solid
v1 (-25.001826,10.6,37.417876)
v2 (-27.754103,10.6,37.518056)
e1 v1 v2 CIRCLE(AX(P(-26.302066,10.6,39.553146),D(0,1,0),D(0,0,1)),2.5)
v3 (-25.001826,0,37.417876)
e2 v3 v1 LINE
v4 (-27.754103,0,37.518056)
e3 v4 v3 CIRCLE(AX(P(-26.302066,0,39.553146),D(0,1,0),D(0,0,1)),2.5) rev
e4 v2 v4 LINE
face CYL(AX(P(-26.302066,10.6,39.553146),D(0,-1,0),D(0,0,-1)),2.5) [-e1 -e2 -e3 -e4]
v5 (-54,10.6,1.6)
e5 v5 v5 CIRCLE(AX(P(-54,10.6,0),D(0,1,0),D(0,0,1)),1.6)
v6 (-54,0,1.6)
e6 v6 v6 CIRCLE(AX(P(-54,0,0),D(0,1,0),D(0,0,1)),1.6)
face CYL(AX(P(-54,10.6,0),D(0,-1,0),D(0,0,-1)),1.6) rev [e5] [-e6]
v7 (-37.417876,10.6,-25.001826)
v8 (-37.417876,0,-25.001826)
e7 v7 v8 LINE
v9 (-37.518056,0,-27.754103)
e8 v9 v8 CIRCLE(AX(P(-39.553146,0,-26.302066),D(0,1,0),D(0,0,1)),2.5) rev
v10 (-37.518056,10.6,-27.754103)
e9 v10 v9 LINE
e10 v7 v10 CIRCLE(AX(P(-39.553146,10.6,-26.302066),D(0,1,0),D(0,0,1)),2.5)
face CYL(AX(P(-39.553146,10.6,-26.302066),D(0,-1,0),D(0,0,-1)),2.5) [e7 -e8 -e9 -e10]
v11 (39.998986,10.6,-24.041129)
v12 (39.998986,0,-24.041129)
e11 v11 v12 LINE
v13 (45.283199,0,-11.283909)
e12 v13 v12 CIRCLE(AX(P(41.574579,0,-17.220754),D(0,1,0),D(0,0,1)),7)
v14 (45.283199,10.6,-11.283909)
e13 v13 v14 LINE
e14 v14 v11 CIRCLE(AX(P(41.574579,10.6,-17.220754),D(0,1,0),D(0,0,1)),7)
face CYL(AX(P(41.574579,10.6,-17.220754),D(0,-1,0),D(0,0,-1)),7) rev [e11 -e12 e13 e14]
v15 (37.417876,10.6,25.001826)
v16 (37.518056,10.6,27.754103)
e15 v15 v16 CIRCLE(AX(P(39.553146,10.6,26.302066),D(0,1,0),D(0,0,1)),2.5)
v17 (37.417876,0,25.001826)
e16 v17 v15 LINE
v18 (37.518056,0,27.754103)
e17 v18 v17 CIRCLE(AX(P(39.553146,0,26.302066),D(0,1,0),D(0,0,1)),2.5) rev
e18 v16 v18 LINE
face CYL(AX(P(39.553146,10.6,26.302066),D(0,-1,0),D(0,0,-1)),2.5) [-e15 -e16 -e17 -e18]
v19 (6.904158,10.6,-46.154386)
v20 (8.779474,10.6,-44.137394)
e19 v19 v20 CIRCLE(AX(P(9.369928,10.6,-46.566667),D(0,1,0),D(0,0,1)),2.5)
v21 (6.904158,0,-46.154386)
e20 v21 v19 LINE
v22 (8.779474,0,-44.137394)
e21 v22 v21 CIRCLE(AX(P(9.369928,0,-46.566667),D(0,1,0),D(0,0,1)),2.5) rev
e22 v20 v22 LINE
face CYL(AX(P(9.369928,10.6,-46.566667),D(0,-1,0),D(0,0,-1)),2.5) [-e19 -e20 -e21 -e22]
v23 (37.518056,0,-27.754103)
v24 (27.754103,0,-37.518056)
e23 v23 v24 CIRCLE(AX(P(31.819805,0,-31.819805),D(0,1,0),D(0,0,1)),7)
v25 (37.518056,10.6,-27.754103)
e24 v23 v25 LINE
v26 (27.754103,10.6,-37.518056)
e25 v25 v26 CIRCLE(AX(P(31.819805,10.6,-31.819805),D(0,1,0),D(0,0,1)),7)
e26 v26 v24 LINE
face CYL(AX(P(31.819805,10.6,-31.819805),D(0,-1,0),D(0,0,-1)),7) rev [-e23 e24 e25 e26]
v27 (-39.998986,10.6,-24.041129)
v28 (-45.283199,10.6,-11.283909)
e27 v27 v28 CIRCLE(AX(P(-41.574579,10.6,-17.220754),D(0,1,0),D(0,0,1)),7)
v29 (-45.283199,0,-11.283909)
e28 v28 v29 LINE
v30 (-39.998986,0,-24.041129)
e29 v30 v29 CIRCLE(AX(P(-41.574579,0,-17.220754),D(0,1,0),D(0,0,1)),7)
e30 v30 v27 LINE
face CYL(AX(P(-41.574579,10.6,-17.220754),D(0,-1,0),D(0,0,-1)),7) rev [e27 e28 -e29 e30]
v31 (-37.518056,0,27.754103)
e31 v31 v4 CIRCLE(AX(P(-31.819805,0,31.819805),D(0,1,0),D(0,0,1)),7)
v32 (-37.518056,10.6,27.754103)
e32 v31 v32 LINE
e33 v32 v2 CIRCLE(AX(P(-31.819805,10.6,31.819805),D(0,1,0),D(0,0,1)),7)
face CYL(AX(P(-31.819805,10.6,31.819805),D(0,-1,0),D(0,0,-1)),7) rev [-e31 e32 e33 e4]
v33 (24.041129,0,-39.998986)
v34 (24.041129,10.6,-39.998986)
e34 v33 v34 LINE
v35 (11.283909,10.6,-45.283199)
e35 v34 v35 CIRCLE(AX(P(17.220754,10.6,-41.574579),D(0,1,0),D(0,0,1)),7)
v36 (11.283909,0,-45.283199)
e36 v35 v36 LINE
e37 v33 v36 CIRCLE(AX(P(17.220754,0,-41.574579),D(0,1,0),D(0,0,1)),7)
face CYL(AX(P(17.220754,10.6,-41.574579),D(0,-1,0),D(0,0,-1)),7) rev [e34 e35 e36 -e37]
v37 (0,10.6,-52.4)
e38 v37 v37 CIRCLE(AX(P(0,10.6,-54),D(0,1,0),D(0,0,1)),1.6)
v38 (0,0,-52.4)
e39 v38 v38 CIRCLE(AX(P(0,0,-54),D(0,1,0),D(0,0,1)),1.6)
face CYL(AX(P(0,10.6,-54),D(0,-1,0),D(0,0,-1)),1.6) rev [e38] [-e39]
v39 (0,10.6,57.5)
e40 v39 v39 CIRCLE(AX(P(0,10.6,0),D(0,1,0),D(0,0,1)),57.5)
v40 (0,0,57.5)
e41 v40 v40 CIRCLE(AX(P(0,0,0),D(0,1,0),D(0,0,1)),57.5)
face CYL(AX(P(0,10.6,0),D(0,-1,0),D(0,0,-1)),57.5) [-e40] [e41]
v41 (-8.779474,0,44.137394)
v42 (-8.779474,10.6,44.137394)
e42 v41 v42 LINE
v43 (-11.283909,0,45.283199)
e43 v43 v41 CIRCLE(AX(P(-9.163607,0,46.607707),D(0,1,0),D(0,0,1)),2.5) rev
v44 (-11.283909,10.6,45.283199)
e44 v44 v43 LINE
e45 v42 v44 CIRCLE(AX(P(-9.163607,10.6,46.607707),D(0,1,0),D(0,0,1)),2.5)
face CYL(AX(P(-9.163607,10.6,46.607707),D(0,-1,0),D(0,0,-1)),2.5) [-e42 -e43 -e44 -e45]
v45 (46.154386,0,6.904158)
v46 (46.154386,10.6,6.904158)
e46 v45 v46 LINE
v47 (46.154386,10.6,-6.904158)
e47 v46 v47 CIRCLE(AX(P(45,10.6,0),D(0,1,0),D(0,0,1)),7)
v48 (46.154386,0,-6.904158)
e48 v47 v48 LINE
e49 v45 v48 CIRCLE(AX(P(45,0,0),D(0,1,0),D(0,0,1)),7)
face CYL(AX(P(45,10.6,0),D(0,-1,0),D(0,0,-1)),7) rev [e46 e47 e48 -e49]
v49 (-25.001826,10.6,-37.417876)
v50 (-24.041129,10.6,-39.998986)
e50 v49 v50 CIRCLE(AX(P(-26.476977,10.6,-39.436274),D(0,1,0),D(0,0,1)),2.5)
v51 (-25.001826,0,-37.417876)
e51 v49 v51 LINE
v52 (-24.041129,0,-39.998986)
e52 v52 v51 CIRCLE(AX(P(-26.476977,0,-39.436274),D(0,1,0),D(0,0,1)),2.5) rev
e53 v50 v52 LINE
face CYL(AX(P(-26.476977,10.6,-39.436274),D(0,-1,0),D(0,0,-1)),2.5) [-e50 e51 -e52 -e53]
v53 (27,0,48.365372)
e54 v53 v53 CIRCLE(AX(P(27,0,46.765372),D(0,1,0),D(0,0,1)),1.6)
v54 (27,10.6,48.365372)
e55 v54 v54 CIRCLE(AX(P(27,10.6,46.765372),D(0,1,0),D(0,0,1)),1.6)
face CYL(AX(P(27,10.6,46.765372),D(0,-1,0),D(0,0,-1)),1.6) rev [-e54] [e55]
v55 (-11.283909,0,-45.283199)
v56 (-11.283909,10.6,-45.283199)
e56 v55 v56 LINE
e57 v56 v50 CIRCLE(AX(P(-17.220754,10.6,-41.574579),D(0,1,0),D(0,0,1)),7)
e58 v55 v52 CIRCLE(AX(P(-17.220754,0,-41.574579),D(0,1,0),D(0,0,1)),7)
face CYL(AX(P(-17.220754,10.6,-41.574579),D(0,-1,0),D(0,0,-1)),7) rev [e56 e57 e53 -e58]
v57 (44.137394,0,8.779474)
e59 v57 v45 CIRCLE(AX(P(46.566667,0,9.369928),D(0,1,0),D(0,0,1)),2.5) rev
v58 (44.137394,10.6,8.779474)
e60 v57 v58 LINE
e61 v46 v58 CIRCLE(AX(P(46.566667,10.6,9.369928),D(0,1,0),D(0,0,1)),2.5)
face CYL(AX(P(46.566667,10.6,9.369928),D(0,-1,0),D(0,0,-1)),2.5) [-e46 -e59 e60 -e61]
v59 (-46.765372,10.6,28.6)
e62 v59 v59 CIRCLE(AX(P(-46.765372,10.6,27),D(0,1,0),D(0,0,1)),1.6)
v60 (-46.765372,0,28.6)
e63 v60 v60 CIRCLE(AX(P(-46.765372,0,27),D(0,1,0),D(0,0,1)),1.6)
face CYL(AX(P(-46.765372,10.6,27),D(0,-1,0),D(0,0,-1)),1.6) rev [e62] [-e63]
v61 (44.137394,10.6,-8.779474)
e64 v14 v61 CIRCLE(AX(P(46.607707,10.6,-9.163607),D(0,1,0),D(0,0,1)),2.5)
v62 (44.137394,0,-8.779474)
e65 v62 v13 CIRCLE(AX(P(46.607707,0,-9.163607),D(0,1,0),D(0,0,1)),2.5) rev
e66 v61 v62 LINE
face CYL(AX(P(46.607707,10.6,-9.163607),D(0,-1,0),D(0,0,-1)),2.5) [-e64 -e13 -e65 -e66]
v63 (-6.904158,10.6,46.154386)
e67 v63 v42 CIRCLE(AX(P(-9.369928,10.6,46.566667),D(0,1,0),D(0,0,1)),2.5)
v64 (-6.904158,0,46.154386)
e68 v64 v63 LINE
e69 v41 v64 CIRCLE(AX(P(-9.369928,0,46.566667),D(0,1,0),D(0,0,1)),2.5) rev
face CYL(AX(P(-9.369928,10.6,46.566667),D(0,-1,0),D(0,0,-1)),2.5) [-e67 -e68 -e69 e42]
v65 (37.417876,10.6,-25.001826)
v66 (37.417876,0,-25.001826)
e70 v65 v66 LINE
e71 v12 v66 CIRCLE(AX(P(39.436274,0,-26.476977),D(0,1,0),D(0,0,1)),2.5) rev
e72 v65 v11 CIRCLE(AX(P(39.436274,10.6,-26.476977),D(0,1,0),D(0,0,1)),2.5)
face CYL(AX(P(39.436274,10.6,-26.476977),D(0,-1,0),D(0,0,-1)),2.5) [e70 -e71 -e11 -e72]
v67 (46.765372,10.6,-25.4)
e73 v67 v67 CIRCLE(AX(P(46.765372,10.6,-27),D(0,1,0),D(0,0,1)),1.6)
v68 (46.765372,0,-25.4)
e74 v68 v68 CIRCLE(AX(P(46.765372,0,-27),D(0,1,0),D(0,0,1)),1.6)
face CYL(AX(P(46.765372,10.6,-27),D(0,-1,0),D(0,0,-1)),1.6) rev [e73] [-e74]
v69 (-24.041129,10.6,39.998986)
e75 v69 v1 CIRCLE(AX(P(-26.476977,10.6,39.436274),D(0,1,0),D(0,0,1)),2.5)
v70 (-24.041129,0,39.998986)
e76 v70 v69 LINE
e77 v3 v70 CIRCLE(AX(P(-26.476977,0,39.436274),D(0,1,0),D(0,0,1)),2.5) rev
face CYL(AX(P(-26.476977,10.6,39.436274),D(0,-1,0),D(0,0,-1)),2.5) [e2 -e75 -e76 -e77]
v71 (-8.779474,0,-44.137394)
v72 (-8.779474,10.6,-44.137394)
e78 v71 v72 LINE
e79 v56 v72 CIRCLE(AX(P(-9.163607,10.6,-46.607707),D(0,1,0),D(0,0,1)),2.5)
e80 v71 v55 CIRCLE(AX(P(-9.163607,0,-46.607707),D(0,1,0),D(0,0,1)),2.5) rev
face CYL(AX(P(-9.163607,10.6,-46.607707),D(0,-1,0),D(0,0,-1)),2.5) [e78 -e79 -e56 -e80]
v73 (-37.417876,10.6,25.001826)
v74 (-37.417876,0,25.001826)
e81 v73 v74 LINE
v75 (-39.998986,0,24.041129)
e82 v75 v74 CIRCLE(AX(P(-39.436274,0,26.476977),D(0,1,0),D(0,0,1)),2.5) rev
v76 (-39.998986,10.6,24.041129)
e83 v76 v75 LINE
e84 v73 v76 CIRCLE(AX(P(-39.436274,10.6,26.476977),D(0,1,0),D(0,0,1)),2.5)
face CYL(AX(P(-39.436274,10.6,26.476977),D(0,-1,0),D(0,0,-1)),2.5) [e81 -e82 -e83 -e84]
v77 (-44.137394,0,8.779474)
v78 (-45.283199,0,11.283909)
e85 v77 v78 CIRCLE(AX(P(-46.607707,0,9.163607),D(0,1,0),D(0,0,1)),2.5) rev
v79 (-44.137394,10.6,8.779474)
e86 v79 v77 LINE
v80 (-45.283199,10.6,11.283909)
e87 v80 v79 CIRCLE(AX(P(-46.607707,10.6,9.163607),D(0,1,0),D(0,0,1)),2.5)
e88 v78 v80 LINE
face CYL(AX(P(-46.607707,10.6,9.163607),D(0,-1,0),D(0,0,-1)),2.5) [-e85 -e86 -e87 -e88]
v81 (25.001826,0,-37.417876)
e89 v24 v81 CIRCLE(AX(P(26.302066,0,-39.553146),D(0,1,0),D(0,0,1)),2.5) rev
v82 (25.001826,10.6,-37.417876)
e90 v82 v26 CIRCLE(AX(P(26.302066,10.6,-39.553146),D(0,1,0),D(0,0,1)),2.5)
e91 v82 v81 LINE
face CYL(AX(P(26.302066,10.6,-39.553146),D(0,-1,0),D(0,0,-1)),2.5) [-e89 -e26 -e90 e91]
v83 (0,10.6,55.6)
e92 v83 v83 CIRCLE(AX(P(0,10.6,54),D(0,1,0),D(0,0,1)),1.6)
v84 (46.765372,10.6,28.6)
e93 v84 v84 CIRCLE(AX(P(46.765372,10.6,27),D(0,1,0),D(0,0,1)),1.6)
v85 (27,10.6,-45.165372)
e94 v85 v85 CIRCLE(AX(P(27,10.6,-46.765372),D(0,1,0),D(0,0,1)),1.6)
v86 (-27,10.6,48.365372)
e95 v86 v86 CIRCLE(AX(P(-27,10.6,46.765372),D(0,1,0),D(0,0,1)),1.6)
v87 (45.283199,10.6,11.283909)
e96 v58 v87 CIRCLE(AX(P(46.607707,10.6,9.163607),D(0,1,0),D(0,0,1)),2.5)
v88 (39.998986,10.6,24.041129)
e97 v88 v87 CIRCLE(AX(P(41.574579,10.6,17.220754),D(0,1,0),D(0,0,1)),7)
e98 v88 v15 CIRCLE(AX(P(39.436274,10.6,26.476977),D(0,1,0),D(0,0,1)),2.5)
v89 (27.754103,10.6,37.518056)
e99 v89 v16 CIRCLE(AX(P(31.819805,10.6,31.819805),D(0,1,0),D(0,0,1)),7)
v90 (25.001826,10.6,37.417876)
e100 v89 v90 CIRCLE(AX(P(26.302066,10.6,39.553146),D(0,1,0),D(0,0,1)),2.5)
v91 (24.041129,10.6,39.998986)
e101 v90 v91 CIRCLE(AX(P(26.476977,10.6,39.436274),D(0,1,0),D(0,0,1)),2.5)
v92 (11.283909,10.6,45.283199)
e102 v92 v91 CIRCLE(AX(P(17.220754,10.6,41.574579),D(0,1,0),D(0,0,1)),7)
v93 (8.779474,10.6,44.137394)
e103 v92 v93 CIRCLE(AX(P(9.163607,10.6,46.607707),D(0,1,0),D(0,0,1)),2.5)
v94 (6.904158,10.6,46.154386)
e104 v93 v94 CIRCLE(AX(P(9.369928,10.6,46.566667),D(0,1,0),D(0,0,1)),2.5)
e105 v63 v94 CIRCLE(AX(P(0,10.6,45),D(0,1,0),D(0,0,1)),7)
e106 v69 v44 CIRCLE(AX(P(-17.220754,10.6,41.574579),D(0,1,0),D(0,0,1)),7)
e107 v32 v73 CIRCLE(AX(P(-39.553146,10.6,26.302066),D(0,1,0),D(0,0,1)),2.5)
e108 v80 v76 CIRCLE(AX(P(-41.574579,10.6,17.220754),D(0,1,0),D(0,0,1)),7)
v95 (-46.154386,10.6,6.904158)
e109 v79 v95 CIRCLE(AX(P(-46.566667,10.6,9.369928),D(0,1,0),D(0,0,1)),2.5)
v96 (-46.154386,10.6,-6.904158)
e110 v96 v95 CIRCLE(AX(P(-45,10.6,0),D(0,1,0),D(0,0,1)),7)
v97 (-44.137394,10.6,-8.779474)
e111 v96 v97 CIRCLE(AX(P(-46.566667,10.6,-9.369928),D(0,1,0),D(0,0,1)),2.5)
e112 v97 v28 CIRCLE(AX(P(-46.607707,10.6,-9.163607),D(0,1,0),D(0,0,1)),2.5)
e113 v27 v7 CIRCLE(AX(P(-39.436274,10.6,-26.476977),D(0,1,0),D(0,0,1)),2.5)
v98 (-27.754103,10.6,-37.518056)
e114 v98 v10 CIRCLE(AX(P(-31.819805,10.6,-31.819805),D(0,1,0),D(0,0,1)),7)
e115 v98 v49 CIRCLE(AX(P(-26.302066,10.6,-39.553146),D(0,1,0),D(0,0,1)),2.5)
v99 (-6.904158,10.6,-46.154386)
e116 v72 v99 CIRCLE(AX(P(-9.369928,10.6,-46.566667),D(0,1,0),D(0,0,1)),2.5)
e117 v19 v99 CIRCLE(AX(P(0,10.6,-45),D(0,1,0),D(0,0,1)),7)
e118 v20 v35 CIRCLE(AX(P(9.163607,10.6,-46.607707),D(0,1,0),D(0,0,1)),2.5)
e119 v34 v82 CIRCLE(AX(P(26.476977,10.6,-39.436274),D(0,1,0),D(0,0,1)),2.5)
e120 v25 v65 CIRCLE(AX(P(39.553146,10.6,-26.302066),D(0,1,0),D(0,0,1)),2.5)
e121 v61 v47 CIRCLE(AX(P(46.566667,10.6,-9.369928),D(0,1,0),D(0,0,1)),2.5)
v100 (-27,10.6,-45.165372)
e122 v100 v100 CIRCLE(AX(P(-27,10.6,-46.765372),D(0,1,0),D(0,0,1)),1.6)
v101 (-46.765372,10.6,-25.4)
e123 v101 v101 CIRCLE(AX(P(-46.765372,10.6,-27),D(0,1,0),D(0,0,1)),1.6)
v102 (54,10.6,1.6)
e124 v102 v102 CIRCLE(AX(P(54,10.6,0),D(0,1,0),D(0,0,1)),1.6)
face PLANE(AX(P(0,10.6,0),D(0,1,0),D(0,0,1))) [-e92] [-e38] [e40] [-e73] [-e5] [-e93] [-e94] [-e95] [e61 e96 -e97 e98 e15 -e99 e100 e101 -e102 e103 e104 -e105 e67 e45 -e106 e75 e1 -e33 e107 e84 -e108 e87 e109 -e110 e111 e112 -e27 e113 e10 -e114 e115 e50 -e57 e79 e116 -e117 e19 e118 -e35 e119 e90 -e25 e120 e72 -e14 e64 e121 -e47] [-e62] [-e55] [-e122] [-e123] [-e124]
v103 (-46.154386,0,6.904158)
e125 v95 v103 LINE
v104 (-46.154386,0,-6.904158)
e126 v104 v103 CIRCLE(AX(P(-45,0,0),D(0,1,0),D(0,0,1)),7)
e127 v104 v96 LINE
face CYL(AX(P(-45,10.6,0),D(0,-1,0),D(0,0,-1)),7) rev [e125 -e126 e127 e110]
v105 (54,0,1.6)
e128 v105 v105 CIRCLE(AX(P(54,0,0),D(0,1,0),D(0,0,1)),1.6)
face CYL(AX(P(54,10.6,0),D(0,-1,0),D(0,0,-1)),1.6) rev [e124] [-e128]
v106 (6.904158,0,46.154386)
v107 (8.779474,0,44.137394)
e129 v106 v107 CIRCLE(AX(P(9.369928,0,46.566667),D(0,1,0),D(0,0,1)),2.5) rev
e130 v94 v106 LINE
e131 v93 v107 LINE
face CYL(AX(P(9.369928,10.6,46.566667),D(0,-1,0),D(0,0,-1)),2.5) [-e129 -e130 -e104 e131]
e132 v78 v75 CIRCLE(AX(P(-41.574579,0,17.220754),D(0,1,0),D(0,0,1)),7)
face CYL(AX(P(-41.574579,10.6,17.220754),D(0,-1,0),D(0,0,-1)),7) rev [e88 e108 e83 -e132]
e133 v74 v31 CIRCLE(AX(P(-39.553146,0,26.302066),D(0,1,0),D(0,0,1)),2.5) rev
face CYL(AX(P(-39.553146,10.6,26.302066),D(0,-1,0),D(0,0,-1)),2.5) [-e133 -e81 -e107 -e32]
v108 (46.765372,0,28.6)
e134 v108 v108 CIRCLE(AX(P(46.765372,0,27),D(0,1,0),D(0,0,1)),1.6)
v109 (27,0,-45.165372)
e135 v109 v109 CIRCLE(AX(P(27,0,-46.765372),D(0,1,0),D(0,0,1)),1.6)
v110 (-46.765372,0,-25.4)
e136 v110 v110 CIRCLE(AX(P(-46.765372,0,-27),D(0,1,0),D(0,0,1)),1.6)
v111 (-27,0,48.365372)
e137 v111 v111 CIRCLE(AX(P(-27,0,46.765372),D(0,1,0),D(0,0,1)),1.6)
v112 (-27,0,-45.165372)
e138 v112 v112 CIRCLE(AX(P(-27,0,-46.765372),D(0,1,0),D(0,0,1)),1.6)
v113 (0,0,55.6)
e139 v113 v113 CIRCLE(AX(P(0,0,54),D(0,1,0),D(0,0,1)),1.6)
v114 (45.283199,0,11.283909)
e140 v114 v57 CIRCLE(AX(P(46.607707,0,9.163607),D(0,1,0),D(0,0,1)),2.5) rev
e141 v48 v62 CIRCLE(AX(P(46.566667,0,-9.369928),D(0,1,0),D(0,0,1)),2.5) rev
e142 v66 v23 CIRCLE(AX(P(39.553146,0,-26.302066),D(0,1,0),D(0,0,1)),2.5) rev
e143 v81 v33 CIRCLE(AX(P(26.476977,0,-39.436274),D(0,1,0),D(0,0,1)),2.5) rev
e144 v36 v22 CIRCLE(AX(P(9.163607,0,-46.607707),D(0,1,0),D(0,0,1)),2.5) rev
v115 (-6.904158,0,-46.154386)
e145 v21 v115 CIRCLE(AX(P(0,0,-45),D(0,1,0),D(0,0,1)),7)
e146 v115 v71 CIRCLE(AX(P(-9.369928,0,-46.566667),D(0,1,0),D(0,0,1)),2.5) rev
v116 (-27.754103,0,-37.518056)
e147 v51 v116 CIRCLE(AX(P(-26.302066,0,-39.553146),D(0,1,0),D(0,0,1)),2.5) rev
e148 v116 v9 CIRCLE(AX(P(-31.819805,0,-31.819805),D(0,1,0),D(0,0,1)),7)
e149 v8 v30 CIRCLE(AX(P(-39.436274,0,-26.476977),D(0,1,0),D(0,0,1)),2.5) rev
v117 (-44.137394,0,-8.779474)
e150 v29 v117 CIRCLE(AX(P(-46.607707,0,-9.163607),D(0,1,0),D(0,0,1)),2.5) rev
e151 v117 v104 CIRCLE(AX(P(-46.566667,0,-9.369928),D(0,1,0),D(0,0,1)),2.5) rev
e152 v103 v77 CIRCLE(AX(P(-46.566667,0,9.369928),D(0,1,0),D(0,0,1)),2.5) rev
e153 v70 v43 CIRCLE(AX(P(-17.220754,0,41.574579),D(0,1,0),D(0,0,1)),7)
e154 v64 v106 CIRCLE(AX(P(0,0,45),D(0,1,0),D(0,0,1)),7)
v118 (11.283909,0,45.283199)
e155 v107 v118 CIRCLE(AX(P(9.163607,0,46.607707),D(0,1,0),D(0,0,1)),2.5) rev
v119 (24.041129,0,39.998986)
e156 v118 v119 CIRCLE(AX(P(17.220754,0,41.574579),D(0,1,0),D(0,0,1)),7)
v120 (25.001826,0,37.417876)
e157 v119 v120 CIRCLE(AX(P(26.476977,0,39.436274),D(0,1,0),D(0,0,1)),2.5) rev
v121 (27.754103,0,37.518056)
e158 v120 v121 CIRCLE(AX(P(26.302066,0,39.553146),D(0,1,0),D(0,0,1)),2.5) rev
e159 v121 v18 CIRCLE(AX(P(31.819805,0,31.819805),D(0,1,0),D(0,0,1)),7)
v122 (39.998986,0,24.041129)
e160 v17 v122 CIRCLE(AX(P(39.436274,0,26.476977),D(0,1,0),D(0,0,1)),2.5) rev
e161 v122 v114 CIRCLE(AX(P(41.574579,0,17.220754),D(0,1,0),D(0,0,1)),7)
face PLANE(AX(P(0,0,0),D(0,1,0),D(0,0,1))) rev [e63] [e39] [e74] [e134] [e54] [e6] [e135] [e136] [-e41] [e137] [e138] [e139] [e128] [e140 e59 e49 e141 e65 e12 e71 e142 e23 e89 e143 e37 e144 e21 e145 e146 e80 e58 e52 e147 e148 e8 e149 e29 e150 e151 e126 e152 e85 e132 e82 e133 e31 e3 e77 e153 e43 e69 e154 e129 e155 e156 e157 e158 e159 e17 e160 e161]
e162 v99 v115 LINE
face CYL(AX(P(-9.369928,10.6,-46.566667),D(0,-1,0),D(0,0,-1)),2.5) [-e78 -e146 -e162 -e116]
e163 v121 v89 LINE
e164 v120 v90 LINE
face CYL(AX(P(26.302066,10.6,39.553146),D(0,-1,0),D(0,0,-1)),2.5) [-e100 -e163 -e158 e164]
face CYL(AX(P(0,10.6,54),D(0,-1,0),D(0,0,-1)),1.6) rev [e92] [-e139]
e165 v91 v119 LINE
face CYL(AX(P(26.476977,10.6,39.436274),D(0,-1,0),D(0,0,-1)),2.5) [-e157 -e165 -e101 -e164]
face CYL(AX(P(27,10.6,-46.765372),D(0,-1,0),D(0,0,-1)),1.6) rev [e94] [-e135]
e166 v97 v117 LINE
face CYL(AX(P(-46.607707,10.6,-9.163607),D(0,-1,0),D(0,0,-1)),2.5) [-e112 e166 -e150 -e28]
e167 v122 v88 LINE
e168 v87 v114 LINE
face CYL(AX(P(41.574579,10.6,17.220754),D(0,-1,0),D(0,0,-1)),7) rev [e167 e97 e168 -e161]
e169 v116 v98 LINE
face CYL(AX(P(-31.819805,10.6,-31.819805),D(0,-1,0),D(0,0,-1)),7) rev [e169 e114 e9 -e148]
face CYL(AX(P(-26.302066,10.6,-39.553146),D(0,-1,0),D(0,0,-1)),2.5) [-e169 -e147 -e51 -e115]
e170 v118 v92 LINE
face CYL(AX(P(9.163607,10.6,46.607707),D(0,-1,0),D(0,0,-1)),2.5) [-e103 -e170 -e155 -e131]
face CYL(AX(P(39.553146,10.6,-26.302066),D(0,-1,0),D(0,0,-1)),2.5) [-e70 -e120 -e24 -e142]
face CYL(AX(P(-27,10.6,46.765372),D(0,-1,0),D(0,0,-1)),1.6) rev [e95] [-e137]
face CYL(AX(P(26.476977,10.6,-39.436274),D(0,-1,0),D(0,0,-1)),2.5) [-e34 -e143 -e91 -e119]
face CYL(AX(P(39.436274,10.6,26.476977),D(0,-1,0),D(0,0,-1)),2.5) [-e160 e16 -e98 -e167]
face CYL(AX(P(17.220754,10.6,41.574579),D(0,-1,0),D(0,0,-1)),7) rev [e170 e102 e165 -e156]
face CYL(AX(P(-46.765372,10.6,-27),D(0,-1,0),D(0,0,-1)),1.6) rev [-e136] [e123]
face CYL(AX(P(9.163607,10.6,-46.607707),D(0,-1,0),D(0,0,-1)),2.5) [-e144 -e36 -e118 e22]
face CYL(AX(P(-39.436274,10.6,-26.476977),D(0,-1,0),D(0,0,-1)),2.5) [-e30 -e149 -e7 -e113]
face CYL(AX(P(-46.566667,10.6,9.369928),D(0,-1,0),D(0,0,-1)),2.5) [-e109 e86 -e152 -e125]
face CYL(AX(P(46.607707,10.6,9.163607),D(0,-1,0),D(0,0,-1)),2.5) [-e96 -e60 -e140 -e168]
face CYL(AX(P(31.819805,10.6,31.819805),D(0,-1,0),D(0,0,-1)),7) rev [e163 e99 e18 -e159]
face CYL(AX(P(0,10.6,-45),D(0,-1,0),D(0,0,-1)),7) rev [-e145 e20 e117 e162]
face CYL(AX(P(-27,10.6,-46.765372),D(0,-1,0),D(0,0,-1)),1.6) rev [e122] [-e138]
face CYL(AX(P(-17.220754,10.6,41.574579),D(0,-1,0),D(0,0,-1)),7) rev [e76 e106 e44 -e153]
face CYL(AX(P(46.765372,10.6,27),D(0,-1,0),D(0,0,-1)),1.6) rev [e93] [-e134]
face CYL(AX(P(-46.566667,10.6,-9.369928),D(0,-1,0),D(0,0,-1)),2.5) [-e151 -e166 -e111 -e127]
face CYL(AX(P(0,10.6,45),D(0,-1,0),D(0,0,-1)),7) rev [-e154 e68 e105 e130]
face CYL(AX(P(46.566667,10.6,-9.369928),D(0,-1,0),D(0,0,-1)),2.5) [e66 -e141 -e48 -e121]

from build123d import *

# Parameters (mm, degrees)
SKETCH1_R           = 57.5
SKETCH1_R_2         = 1.6
BOSS_EXTRUDE1_DEPTH = 10.6
FILLET1_R           = 2.5


with BuildPart() as part:
    # Sketch1 → Boss-Extrude1 (new body)
    with BuildSketch(Plane(origin=(0, 0, 0), x_dir=(1, 0, 0), z_dir=(0, 1, 0))):
        with Locations(Location((0, 0, 0), (0, 0, 270))):
            Circle(SKETCH1_R)
        with Locations(Location((-27, -46.765371804, 0), (0, 0, 270))):
            Circle(SKETCH1_R_2, mode=Mode.SUBTRACT)
        with Locations(Location((-46.765371804, -27, 0), (0, 0, 270))):
            Circle(SKETCH1_R_2, mode=Mode.SUBTRACT)
        with Locations(Location((-54, 0, 0), (0, 0, 270))):
            Circle(SKETCH1_R_2, mode=Mode.SUBTRACT)
        with Locations(Location((0, -54, 0), (0, 0, 270))):
            Circle(SKETCH1_R_2, mode=Mode.SUBTRACT)
        with Locations(Location((27, -46.765371804, 0), (0, 0, 270))):
            Circle(SKETCH1_R_2, mode=Mode.SUBTRACT)
        with BuildLine():
            ThreePointArc((43.742247125, 10.564838686), (44.135337618, 8.779064491), (44.455555556, 6.978795043))
            ThreePointArc((44.455555556, 6.978795043), (49.753361384, 5.138633627), (52, 0))
            ThreePointArc((52, 0), (49.753361384, -5.138633627), (44.455555556, -6.978795043))
            ThreePointArc((44.455555556, -6.978795043), (44.135337618, -8.779064491), (43.742247125, -10.564838686))
            ThreePointArc((43.742247125, -10.564838686), (47.23910353, -13.108193036), (48.574578963, -17.220754456))
            ThreePointArc((48.574578963, -17.220754456), (45.234108152, -23.187985482), (38.400908644, -23.459970489))
            ThreePointArc((38.400908644, -23.459970489), (37.416132554, -25.000660486), (36.369578094, -26.500071496))
            ThreePointArc((36.369578094, -26.500071496), (38.177808401, -28.89135937), (38.819805153, -31.819805153))
            ThreePointArc((38.819805153, -31.819805153), (34.244868492, -38.386316236), (26.500071496, -36.369578094))
            ThreePointArc((26.500071496, -36.369578094), (25.000660486, -37.416132554), (23.459970489, -38.400908644))
            ThreePointArc((23.459970489, -38.400908644), (24.027901885, -39.942787345), (24.220754456, -41.574578963))
            ThreePointArc((24.220754456, -41.574578963), (18.318158122, -48.488022764), (10.564838686, -43.742247125))
            ThreePointArc((10.564838686, -43.742247125), (8.779064491, -44.135337618), (6.978795043, -44.455555556))
            ThreePointArc((6.978795043, -44.455555556), (6.994696752, -44.727571384), (7, -45))
            ThreePointArc((7, -45), (-0.272428616, -51.994696752), (-6.978795043, -44.455555556))
            ThreePointArc((-6.978795043, -44.455555556), (-8.779064491, -44.135337618), (-10.564838686, -43.742247125))
            ThreePointArc((-10.564838686, -43.742247125), (-19.899538483, -48.041735691), (-23.459970489, -38.400908644))
            ThreePointArc((-23.459970489, -38.400908644), (-25.000660486, -37.416132554), (-26.500071496, -36.369578094))
            ThreePointArc((-26.500071496, -36.369578094), (-36.769552622, -36.769552622), (-36.369578094, -26.500071496))
            ThreePointArc((-36.369578094, -26.500071496), (-37.416132554, -25.000660486), (-38.400908644, -23.459970489))
            ThreePointArc((-38.400908644, -23.459970489), (-48.041735691, -19.899538483), (-43.742247125, -10.564838686))
            ThreePointArc((-43.742247125, -10.564838686), (-44.135337618, -8.779064491), (-44.455555556, -6.978795043))
            ThreePointArc((-44.455555556, -6.978795043), (-52, 0), (-44.455555556, 6.978795043))
            ThreePointArc((-44.455555556, 6.978795043), (-44.135337618, 8.779064491), (-43.742247125, 10.564838686))
            ThreePointArc((-43.742247125, 10.564838686), (-48.041735691, 19.899538483), (-38.400908644, 23.459970489))
            ThreePointArc((-38.400908644, 23.459970489), (-37.416132554, 25.000660486), (-36.369578094, 26.500071496))
            ThreePointArc((-36.369578094, 26.500071496), (-36.769552622, 36.769552622), (-26.500071496, 36.369578094))
            ThreePointArc((-26.500071496, 36.369578094), (-25.000660486, 37.416132554), (-23.459970489, 38.400908644))
            ThreePointArc((-23.459970489, 38.400908644), (-19.899538483, 48.041735691), (-10.564838686, 43.742247125))
            ThreePointArc((-10.564838686, 43.742247125), (-8.779064491, 44.135337618), (-6.978795043, 44.455555556))
            ThreePointArc((-6.978795043, 44.455555556), (-0.272428616, 51.994696752), (7, 45))
            ThreePointArc((7, 45), (6.994696752, 44.727571384), (6.978795043, 44.455555556))
            ThreePointArc((6.978795043, 44.455555556), (8.779064491, 44.135337618), (10.564838686, 43.742247125))
            ThreePointArc((10.564838686, 43.742247125), (18.318158122, 48.488022764), (24.220754456, 41.574578963))
            ThreePointArc((24.220754456, 41.574578963), (24.027901885, 39.942787345), (23.459970489, 38.400908644))
            ThreePointArc((23.459970489, 38.400908644), (25.000660486, 37.416132554), (26.500071496, 36.369578094))
            ThreePointArc((26.500071496, 36.369578094), (34.244868492, 38.386316236), (38.819805153, 31.819805153))
            ThreePointArc((38.819805153, 31.819805153), (38.177808401, 28.89135937), (36.369578094, 26.500071496))
            ThreePointArc((36.369578094, 26.500071496), (37.416132554, 25.000660486), (38.400908644, 23.459970489))
            ThreePointArc((38.400908644, 23.459970489), (45.234108152, 23.187985482), (48.574578963, 17.220754456))
            ThreePointArc((48.574578963, 17.220754456), (47.23910353, 13.108193036), (43.742247125, 10.564838686))
        make_face(mode=Mode.SUBTRACT)
        with Locations(Location((46.765371804, -27, 0), (0, 0, 270))):
            Circle(SKETCH1_R_2, mode=Mode.SUBTRACT)
        with Locations(Location((-46.765371804, 27, 0), (0, 0, 270))):
            Circle(SKETCH1_R_2, mode=Mode.SUBTRACT)
        with Locations(Location((-27, 46.765371804, 0), (0, 0, 270))):
            Circle(SKETCH1_R_2, mode=Mode.SUBTRACT)
        with Locations(Location((54, 0, 0), (0, 0, 270))):
            Circle(SKETCH1_R_2, mode=Mode.SUBTRACT)
        with Locations(Location((46.765371804, 27, 0), (0, 0, 270))):
            Circle(SKETCH1_R_2, mode=Mode.SUBTRACT)
        with Locations(Location((0, 54, 0), (0, 0, 270))):
            Circle(SKETCH1_R_2, mode=Mode.SUBTRACT)
        with Locations(Location((27, 46.765371804, 0), (0, 0, 270))):
            Circle(SKETCH1_R_2, mode=Mode.SUBTRACT)
    extrude(amount=BOSS_EXTRUDE1_DEPTH)

    # Fillet1
    # the kernel refuses this fillet: 2.5 mm, written as the material it takes off along each edge
    with BuildSketch(Plane(origin=(43.742247125, -4.820377086, -10.564838686), x_dir=(0.21389520927514544, 0, 0.9768566115091517), z_dir=(0, 1, 0)), Plane(origin=(44.455555556, -4.820377086, 6.978795043), x_dir=(-0.17621343506931061, 0, 0.9843519824234996), z_dir=(0, 1, 0)), Plane(origin=(38.400908644, -4.820377086, 23.459970489), x_dir=(-0.5394951813032318, 0, 0.841988687186825), z_dir=(0, 1, 0)), Plane(origin=(26.500071496, -4.820377086, 36.369578094), x_dir=(-0.8206436767197667, 0, 0.5714402469723874), z_dir=(0, 1, 0)), Plane(origin=(10.564838686, -4.820377086, 43.742247125), x_dir=(-0.9768566115091482, 0, 0.21389520927516179), z_dir=(0, 1, 0)), Plane(origin=(-6.978795043, -4.820377086, 44.455555556), x_dir=(-0.9843519824235082, 0, -0.1762134350692629), z_dir=(0, 1, 0)), Plane(origin=(-23.459970489, -4.820377086, 38.400908644), x_dir=(-0.8419886871868016, 0, -0.5394951813032682), z_dir=(0, 1, 0)), Plane(origin=(-36.369578094, -4.820377086, 26.500071496), x_dir=(-0.5714402469723492, 0, -0.8206436767197933), z_dir=(0, 1, 0)), Plane(origin=(23.459970489, -4.820377086, -38.400908644), x_dir=(0.8419886871867822, 0, 0.5394951813032985), z_dir=(0, 1, 0)), Plane(origin=(6.978795043, -4.820377086, -44.455555556), x_dir=(0.9843519824234905, 0, 0.1762134350693622), z_dir=(0, 1, 0)), Plane(origin=(-10.564838686, -4.820377086, -43.742247125), x_dir=(0.9768566115091611, 0, -0.21389520927510192), z_dir=(0, 1, 0)), Plane(origin=(-26.500071496, -4.820377086, -36.369578094), x_dir=(0.8206436767197971, 0, -0.5714402469723435), z_dir=(0, 1, 0)), Plane(origin=(-38.400908644, -4.820377086, -23.459970489), x_dir=(0.5394951813033058, 0, -0.8419886871867777), z_dir=(0, 1, 0)), Plane(origin=(-44.455555556, -4.820377086, -6.978795043), x_dir=(0.17621343506938397, 0, -0.9843519824234865), z_dir=(0, 1, 0)), Plane(origin=(-43.742247125, -4.820377086, 10.564838686), x_dir=(-0.21389520927510172, 0, -0.9768566115091614), z_dir=(0, 1, 0))) as fillet1_piece_1:
        with BuildLine():
            CenterArc((1.98171058, 2.499426205), FILLET1_R, 199.641418976, 69.130988159)
            ThreePointArc((-0.372826194, 1.659094972), (-0.135846618, 0.840910614), (0, 0))
            ThreePointArc((0, 0), (0.964075417, 0.010328312), (1.928150834, 0))
        make_face()
    extrude(amount=20.240754172, mode=Mode.SUBTRACT)
    with BuildSketch(Plane(origin=(38.400908644, -4.820377086, -23.459970489), x_dir=(0.9397859916311062, 0, -0.34176350000247), z_dir=(0, 1, 0)), Plane(origin=(26.500071496, -4.820377086, -36.369578094), x_dir=(0.7374618133707781, 0, -0.6753888315776947), z_dir=(0, 1, 0)), Plane(origin=(44.455555556, -4.820377086, -6.978795043), x_dir=(0.9990362718468525, 0, 0.043892226354353435), z_dir=(0, 1, 0)), Plane(origin=(43.742247125, -4.820377086, 10.564838686), x_dir=(0.9061923359602189, 0, 0.42286575913280305), z_dir=(0, 1, 0)), Plane(origin=(36.369578094, -4.820377086, 26.500071496), x_dir=(0.6753888315777279, 0, 0.7374618133707476), z_dir=(0, 1, 0)), Plane(origin=(23.459970489, -4.820377086, 38.400908644), x_dir=(0.3417635000024204, 0, 0.9397859916311243), z_dir=(0, 1, 0)), Plane(origin=(6.978795043, -4.820377086, 44.455555556), x_dir=(-0.043892226354455326, 0, 0.9990362718468481), z_dir=(0, 1, 0)), Plane(origin=(-10.564838686, -4.820377086, 43.742247125), x_dir=(-0.4228657591328737, 0, 0.9061923359601859), z_dir=(0, 1, 0)), Plane(origin=(-26.500071496, -4.820377086, 36.369578094), x_dir=(-0.7374618133709434, 0, 0.6753888315775142), z_dir=(0, 1, 0)), Plane(origin=(10.564838686, -4.820377086, -43.742247125), x_dir=(0.4228657591329353, 0, -0.9061923359601571), z_dir=(0, 1, 0)), Plane(origin=(-6.978795043, -4.820377086, -44.455555556), x_dir=(0.04389222635458482, 0, -0.9990362718468423), z_dir=(0, 1, 0)), Plane(origin=(-23.459970489, -4.820377086, -38.400908644), x_dir=(-0.3417635000022023, 0, -0.9397859916312036), z_dir=(0, 1, 0)), Plane(origin=(-36.369578094, -4.820377086, -26.500071496), x_dir=(-0.6753888315774389, 0, -0.7374618133710125), z_dir=(0, 1, 0)), Plane(origin=(-43.742247125, -4.820377086, -10.564838686), x_dir=(-0.9061923359601008, 0, -0.422865759133056), z_dir=(0, 1, 0)), Plane(origin=(-44.455555556, -4.820377086, 6.978795043), x_dir=(-0.9990362718468366, 0, -0.04389222635471359), z_dir=(0, 1, 0)), Plane(origin=(-38.400908644, -4.820377086, 23.459970489), x_dir=(-0.9397859916312232, 0, 0.3417635000021483), z_dir=(0, 1, 0))) as fillet1_piece_2:
        with BuildLine():
            CenterArc((2.004124414, 2.481490179), FILLET1_R, 193.892520635, 69.130988159)
            ThreePointArc((-0.422745168, 1.881236871), (-0.201295571, 0.942882908), (0, 0))
            ThreePointArc((0, 0), (0.8502346, 0.051827497), (1.700469199, 0))
        make_face()
    extrude(amount=20.240754172, mode=Mode.SUBTRACT)
    with BuildSketch(Plane(origin=(36.369578094, -4.820377086, -26.500071496), x_dir=(0.6753888315776805, 0, -0.7374618133707912), z_dir=(0, 1, 0))) as fillet1_piece_3:
        with BuildLine():
            CenterArc((2.004124414, -2.481490179), FILLET1_R, 96.976491207, 69.130988159)
            ThreePointArc((-0.422745168, -1.881236871), (-0.201295571, -0.942882908), (0, 0))
            ThreePointArc((0, 0), (0.8502346, -0.051827497), (1.700469199, 0))
        make_face()
    extrude(amount=20.240754172, mode=Mode.SUBTRACT)


solid = part.part
